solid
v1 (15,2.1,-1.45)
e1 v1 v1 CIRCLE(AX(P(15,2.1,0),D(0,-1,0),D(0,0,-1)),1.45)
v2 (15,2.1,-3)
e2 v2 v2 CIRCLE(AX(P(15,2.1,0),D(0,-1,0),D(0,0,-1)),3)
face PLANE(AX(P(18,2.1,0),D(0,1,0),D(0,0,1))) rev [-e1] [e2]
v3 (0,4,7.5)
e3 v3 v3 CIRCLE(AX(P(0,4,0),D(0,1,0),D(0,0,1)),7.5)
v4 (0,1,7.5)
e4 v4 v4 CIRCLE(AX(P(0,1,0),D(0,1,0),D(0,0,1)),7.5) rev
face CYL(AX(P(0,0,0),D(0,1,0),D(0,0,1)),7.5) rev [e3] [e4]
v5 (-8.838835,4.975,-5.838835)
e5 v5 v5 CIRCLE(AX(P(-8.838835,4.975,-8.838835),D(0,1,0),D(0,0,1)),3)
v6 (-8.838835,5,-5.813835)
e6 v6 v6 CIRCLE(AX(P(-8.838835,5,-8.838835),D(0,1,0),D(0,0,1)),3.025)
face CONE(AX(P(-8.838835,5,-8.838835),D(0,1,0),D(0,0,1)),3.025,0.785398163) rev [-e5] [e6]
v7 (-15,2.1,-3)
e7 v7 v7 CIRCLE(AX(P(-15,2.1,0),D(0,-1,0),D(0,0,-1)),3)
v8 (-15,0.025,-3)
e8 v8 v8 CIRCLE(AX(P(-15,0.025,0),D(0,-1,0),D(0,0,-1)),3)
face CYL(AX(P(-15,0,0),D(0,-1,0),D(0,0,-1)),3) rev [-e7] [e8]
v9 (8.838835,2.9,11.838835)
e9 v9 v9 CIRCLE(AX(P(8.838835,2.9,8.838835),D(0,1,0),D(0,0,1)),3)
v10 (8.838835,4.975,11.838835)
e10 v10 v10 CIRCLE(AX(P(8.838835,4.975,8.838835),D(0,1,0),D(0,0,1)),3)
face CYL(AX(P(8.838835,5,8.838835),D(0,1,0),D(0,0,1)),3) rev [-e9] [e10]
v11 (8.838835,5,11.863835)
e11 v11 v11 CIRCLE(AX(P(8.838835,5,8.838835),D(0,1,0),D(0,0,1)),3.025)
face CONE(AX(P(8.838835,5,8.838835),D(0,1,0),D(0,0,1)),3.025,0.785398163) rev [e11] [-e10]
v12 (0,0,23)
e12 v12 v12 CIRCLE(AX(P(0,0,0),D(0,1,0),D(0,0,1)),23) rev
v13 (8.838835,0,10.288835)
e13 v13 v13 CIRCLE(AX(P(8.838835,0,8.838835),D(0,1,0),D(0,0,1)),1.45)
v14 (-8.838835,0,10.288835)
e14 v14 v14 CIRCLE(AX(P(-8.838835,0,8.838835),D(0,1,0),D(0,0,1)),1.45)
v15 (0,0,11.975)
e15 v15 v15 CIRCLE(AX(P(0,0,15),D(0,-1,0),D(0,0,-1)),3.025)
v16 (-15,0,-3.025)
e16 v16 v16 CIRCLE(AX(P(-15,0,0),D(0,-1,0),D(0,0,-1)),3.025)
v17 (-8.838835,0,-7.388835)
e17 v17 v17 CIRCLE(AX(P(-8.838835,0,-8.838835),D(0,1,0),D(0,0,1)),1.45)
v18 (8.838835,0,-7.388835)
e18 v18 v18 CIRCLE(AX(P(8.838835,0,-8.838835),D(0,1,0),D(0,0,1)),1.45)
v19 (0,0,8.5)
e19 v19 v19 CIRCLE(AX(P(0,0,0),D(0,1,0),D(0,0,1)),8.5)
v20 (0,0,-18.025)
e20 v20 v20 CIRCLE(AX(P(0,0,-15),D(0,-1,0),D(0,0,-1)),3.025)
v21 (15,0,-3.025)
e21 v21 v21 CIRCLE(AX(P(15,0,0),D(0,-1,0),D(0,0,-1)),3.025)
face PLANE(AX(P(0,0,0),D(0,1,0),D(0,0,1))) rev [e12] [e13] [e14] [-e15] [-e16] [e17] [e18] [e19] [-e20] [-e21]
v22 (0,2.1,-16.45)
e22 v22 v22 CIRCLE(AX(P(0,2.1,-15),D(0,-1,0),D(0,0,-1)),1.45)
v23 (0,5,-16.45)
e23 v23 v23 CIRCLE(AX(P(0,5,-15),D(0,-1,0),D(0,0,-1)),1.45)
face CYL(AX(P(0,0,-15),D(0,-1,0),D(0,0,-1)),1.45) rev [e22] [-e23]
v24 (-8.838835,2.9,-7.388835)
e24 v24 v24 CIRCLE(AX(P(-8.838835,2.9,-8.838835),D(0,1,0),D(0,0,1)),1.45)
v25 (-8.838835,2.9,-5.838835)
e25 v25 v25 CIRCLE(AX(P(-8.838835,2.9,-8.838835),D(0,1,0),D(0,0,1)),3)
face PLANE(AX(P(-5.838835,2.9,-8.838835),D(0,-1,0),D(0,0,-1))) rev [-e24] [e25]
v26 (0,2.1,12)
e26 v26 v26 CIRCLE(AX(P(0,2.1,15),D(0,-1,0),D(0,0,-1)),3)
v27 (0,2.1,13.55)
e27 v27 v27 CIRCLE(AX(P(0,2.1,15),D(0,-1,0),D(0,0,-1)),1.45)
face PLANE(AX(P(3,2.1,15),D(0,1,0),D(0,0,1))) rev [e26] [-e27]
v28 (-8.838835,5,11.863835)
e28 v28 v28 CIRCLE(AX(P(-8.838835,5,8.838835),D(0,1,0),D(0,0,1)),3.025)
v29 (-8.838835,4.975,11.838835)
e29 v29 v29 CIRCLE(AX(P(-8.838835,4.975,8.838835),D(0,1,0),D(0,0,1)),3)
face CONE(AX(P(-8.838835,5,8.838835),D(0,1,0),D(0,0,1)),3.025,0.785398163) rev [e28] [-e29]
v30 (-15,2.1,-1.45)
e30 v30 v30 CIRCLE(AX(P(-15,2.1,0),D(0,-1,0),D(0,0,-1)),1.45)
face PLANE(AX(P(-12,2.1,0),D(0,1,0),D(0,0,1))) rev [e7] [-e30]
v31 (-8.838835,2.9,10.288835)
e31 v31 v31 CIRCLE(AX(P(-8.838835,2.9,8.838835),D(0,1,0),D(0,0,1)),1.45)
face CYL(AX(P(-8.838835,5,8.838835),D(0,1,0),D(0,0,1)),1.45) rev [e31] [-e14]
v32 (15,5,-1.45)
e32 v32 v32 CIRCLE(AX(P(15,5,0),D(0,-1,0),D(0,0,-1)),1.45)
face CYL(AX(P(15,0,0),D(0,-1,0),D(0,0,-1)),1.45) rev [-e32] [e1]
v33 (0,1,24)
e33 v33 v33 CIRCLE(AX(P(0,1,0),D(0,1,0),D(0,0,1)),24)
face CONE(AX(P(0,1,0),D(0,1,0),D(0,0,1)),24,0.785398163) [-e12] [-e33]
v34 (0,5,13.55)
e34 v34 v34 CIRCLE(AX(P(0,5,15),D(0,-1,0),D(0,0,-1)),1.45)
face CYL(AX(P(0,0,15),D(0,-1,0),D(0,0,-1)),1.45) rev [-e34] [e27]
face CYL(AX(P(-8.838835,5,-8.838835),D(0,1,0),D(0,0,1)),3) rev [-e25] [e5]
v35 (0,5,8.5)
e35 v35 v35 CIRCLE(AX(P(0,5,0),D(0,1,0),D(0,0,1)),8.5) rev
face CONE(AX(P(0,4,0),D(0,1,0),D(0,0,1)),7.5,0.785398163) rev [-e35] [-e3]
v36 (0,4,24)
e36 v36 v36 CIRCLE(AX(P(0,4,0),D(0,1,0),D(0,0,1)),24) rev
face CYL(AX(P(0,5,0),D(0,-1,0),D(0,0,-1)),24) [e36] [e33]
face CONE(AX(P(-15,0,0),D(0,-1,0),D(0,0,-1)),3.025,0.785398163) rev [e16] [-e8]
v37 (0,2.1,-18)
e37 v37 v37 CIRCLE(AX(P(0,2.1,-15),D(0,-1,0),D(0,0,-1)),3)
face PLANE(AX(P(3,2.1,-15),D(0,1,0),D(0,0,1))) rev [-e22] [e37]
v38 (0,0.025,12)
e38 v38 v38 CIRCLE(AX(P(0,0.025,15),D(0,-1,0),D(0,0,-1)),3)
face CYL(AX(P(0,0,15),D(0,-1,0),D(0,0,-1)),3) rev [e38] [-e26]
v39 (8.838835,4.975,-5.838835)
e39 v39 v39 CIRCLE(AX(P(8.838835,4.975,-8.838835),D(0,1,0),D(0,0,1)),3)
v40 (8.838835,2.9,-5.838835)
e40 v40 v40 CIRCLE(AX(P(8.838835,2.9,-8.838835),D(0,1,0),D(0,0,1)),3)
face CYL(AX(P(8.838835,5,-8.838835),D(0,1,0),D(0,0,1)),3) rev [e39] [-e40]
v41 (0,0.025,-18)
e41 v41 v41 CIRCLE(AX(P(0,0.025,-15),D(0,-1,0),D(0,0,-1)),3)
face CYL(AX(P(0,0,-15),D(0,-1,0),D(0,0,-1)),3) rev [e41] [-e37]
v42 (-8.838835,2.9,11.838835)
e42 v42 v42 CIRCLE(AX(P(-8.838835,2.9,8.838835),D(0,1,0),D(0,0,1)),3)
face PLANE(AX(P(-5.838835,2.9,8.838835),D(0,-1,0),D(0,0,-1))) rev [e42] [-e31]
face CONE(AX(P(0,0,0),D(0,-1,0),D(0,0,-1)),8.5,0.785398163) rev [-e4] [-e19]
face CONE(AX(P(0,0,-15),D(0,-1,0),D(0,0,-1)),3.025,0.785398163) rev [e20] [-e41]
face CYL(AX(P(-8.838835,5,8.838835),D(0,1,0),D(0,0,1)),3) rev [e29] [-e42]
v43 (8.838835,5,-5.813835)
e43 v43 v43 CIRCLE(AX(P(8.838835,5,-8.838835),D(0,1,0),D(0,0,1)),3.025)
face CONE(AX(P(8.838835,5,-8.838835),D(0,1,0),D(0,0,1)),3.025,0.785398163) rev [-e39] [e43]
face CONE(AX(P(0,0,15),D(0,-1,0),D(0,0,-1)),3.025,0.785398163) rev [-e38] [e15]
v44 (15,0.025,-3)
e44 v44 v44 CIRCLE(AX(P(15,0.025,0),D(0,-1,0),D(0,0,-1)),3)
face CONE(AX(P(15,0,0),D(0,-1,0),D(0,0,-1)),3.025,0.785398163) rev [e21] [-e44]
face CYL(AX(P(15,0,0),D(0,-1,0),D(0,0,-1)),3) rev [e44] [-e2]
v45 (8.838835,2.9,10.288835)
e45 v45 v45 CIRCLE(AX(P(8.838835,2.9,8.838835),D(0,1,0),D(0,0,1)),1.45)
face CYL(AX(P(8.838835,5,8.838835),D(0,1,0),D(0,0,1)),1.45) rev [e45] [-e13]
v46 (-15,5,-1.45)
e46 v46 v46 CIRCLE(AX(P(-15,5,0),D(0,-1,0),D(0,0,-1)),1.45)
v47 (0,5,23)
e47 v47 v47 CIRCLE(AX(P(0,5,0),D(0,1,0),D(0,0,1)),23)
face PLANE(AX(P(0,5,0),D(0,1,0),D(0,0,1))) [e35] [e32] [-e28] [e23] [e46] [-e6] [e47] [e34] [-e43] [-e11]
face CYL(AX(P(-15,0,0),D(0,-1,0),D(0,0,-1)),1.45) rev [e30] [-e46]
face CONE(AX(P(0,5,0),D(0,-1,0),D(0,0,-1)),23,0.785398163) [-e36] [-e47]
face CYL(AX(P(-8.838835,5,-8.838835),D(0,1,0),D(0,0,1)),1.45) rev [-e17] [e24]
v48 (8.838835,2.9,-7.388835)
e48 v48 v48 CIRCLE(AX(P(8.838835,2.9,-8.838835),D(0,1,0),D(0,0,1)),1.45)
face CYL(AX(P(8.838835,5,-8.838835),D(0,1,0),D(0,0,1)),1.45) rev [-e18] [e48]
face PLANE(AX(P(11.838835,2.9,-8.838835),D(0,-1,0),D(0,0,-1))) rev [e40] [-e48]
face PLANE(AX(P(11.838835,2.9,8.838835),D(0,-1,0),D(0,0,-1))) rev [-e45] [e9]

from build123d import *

# Parameters (mm, degrees)
SKETCH1_R               = 24
BOSS_EXTRUDE1_DEPTH     = 5
CUT_EXTRUDE1_DEPTH      = 35.307433597
CUT_EXTRUDE1_DEPTH_BACK = 35.307433597
SKETCH8_R               = 7.5
CHAMFER1_SIZE           = 1
CHAMFER2_SIZE           = 1


# Read off the part's stored shape, not the designer's step: CBORE for M2.5 Pan Head Screw1, CBORE for M2.5 Pan Head Screw2
with BuildPart() as part:
    # Sketch1 → Boss-Extrude1 (new body)
    with BuildSketch(Plane(origin=(0, 0, 0), x_dir=(1, 0, 0), z_dir=(0, 1, 0))):
        with Locations(Location((0, 0, 0), (0, 0, 270))):
            Circle(SKETCH1_R)
    extrude(amount=BOSS_EXTRUDE1_DEPTH)

    # CBORE for M2.5 Pan Head Screw1 outline → CBORE for M2.5 Pan Head Screw1 (revolve, cut)
    with BuildSketch(Plane(origin=(8.838834765, 0, 8.838834765), x_dir=(1, 0, 0), z_dir=(0, 0, 1))):
        Polygon((0, 0), (1.45, 0), (1.45, 2.9), (3, 2.9), (3, 4.975), (3.025, 5), (0, 5), align=None)
    revolve(axis=Axis((8.838834765, 0, 8.838834765), (0, 1, 0)), mode=Mode.SUBTRACT)

    # CBORE for M2.5 Pan Head Screw1 2 outline → CBORE for M2.5 Pan Head Screw1 2 (revolve, cut)
    with BuildSketch(Plane(origin=(-8.838834765, 0, -8.838834765), x_dir=(1, 0, 0), z_dir=(0, 0, 1))):
        Polygon((0, 5), (0, 0), (1.45, 0), (1.45, 2.9), (3, 2.9), (3, 4.975), (3.025, 5), align=None)
    revolve(axis=Axis((-8.838834765, 0, -8.838834765), (0, 1, 0)), mode=Mode.SUBTRACT)

    # CBORE for M2.5 Pan Head Screw1 3 outline → CBORE for M2.5 Pan Head Screw1 3 (revolve, cut)
    with BuildSketch(Plane(origin=(-8.838834765, 0, 8.838834765), x_dir=(1, 0, 0), z_dir=(0, 0, 1))):
        Polygon((0, 5), (0, 0), (1.45, 0), (1.45, 2.9), (3, 2.9), (3, 4.975), (3.025, 5), align=None)
    revolve(axis=Axis((-8.838834765, 0, 8.838834765), (0, 1, 0)), mode=Mode.SUBTRACT)

    # CBORE for M2.5 Pan Head Screw1 4 outline → CBORE for M2.5 Pan Head Screw1 4 (revolve, cut)
    with BuildSketch(Plane(origin=(8.838834765, 0, -8.838834765), x_dir=(1, 0, 0), z_dir=(0, 0, 1))):
        Polygon((0, 5), (0, 0), (1.45, 0), (1.45, 2.9), (3, 2.9), (3, 4.975), (3.025, 5), align=None)
    revolve(axis=Axis((8.838834765, 0, -8.838834765), (0, 1, 0)), mode=Mode.SUBTRACT)

    # CBORE for M2.5 Pan Head Screw2 outline → CBORE for M2.5 Pan Head Screw2 (revolve, cut)
    with BuildSketch(Plane.XY.offset(-15)):
        Polygon((1.45, 2.1), (1.45, 5), (0, 5), (0, 0), (3.025, 0), (3, 0.025), (3, 2.1), align=None)
    revolve(axis=Axis((0, 0, -15), (0, 1, 0)), mode=Mode.SUBTRACT)

    # CBORE for M2.5 Pan Head Screw2 2 outline → CBORE for M2.5 Pan Head Screw2 2 (revolve, cut)
    with BuildSketch(Plane.XY.offset(15)):
        Polygon((0, 0), (3.025, 0), (3, 0.025), (3, 2.1), (1.45, 2.1), (1.45, 5), (0, 5), align=None)
    revolve(axis=Axis((0, 0, 15), (0, 1, 0)), mode=Mode.SUBTRACT)

    # CBORE for M2.5 Pan Head Screw2 3 outline → CBORE for M2.5 Pan Head Screw2 3 (revolve, cut)
    with BuildSketch(Plane(origin=(-15, 0, 0), x_dir=(1, 0, 0), z_dir=(0, 0, 1))):
        Polygon((0, 0), (3.025, 0), (3, 0.025), (3, 2.1), (1.45, 2.1), (1.45, 5), (0, 5), align=None)
    revolve(axis=Axis((-15, 0, 0), (0, 1, 0)), mode=Mode.SUBTRACT)

    # CBORE for M2.5 Pan Head Screw2 4 outline → CBORE for M2.5 Pan Head Screw2 4 (revolve, cut)
    with BuildSketch(Plane(origin=(15, 0, 0), x_dir=(1, 0, 0), z_dir=(0, 0, 1))):
        Polygon((0, 0), (3.025, 0), (3, 0.025), (3, 2.1), (1.45, 2.1), (1.45, 5), (0, 5), align=None)
    revolve(axis=Axis((15, 0, 0), (0, 1, 0)), mode=Mode.SUBTRACT)

    # Sketch8 → Cut-Extrude1 (cut, two sides: drawn at the far end of the back side and taken through both)
    with BuildSketch(Plane(origin=(0, 5, 0), x_dir=(1, 0, 0), z_dir=(0, 1, 0)).offset(-CUT_EXTRUDE1_DEPTH_BACK)):
        with Locations(Location((0, 0, 0), (0, 0, 270))):
            Circle(SKETCH8_R)
    extrude(amount=CUT_EXTRUDE1_DEPTH + CUT_EXTRUDE1_DEPTH_BACK, mode=Mode.SUBTRACT)

    # Chamfer1
    chamfer1_edges = [part.edges().sort_by_distance(p)[0] for p in [
        (0, 5, -7.5),
        (0, 0, -7.5),
    ]]
    chamfer(chamfer1_edges, length=CHAMFER1_SIZE)

    # Chamfer2
    chamfer2_edges = [part.edges().sort_by_distance(p)[0] for p in [
        (0, 0, -24),
        (0, 5, -24),
    ]]
    chamfer(chamfer2_edges, length=CHAMFER2_SIZE)


solid = part.part
